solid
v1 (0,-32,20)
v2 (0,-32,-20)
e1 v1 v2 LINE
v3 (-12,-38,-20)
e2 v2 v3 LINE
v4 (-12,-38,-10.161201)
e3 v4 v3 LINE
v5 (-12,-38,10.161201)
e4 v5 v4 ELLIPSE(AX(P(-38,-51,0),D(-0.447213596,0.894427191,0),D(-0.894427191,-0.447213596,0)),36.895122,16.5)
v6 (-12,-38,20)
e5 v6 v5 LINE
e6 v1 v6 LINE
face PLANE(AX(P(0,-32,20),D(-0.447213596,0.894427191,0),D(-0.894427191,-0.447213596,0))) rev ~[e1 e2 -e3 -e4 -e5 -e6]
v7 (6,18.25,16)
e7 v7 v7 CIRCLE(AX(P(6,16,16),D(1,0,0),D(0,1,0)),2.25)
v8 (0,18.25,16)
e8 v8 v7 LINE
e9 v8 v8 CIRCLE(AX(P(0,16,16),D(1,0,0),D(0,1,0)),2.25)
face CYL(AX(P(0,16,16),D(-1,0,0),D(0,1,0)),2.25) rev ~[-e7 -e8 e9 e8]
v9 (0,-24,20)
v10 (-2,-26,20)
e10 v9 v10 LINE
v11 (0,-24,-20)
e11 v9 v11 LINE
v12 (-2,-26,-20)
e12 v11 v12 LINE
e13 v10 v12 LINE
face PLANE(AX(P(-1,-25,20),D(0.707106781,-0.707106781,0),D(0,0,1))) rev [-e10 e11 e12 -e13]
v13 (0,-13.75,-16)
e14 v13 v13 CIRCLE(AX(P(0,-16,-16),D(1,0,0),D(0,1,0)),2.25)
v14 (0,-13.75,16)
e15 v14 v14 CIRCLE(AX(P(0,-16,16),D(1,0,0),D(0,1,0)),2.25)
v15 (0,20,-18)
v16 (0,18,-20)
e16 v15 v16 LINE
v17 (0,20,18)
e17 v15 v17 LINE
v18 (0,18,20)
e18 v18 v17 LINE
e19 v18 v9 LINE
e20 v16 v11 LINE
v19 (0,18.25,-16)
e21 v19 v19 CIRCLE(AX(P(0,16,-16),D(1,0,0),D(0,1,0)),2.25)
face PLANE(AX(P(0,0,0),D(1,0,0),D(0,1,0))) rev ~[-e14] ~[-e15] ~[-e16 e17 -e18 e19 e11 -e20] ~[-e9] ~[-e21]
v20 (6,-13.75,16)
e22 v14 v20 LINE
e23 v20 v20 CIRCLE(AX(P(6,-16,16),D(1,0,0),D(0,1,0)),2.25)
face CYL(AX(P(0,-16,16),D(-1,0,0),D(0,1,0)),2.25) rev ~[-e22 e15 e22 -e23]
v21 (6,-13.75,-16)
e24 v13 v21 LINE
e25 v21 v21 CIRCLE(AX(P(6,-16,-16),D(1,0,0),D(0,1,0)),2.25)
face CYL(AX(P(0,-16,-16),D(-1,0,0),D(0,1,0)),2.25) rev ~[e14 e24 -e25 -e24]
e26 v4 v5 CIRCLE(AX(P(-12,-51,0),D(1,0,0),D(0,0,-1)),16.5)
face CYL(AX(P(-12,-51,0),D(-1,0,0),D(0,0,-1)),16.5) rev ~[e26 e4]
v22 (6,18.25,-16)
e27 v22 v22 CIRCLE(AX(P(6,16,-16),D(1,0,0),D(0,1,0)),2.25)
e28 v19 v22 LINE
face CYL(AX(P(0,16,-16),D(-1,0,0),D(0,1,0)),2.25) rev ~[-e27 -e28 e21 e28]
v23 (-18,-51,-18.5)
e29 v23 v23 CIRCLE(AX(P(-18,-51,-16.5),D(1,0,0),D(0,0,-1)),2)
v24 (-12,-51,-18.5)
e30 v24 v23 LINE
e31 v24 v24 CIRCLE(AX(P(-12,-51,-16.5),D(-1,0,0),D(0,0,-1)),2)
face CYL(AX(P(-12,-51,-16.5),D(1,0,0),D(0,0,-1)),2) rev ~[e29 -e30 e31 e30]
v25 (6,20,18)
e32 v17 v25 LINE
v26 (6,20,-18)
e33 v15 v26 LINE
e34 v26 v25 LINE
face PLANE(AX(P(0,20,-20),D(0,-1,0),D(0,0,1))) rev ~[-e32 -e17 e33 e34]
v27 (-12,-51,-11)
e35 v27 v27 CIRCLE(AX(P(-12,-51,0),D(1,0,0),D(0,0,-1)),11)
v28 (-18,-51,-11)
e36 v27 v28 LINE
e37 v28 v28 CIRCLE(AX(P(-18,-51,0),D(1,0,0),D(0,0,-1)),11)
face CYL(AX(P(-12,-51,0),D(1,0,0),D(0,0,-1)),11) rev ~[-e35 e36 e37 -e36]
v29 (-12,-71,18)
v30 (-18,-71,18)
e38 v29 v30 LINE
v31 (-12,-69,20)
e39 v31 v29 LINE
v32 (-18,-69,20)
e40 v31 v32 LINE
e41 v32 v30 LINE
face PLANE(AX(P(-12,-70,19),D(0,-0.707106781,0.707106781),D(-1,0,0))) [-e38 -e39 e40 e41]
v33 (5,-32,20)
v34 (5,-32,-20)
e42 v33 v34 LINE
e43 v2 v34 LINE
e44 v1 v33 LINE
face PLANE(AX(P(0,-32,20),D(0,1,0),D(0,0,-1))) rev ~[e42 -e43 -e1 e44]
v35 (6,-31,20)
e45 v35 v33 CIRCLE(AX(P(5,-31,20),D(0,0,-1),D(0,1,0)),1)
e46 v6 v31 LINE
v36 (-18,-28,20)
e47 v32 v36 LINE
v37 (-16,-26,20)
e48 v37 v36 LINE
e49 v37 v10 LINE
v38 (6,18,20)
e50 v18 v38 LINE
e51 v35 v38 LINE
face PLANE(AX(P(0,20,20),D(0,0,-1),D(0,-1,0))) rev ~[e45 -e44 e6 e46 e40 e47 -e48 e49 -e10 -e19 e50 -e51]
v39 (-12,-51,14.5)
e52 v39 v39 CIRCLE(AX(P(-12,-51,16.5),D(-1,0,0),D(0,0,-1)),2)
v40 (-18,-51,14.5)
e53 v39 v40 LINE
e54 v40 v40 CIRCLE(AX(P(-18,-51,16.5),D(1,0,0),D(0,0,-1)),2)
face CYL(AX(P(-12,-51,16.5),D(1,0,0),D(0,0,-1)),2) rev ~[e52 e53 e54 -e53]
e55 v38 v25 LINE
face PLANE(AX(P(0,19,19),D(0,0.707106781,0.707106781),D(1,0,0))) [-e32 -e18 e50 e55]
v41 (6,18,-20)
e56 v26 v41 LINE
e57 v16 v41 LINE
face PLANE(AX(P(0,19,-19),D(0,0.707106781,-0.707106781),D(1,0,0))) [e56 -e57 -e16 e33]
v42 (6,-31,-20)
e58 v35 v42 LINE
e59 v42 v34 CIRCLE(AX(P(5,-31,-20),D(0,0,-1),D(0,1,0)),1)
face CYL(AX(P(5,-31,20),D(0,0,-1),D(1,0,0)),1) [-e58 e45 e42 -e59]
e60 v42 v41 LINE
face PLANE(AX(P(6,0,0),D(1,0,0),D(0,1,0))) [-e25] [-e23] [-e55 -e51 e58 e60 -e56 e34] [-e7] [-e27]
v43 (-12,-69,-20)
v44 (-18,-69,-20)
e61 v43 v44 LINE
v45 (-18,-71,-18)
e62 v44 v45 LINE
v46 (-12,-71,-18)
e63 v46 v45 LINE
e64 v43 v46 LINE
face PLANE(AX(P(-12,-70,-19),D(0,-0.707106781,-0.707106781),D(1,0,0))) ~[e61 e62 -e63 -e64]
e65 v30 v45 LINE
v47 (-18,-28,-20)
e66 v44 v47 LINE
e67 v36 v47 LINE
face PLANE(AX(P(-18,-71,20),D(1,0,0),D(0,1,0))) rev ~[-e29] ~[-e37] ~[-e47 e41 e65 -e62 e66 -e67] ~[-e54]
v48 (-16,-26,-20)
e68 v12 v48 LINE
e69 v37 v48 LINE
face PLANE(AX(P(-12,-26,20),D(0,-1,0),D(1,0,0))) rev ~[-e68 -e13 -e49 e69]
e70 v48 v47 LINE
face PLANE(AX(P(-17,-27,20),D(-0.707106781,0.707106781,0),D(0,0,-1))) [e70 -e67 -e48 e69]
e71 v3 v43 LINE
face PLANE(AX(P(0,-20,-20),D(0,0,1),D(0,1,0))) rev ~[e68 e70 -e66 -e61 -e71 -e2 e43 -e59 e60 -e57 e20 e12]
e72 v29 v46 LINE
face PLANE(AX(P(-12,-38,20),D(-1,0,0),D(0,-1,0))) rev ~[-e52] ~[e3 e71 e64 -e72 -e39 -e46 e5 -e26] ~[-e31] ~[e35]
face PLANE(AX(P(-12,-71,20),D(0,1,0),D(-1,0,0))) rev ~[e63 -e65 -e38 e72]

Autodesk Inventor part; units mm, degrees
ref_plane "YZ Plane" through (0, 0, 0) normal (1, 0, 0) x (0, 1, 0)
ref_plane "XZ Plane" through (0, 0, 0) normal (0, 1, 0) x (-1, 0, 0)
ref_plane "XY Plane" through (0, 0, 0) normal (0, 0, 1) x (1, 0, 0)
sketch "Skizze1" plane through (0, 0, 0) normal (1, 0, 0) x (0, 1, 0)
  line L0 (-20, -20) -> (20, -20)
  line L1 (20, -20) -> (20, 20)
  line L2 (20, 20) -> (-20, 20)
  line L3 (-20, 20) -> (-20, -20)
  line L4 (-20, -20) -> (20, 20) construction
  line L5 (20, -20) -> (-20, 20) construction
  line L6 (-16, -16) -> (16, -16) construction
  line L7 (16, -16) -> (16, 16) construction
  line L8 (16, 16) -> (-16, 16) construction
  line L9 (-16, 16) -> (-16, -16) construction
  line L10 (-16, -16) -> (16, 16) construction
  line L11 (16, -16) -> (-16, 16) construction
  circle A0 centre (16, 16) radius 2.25
  circle A1 centre (16, -16) radius 2.25
  circle A2 centre (-16, -16) radius 2.25
  circle A3 centre (-16, 16) radius 2.25
  line L12 (-20, 20) -> (-32, 20)
  line L13 (-32, 20) -> (-32, -20)
  line L14 (-32, -20) -> (-20, -20)
  line L15 (-20, -20) -> (-20, 20)
  point P0 (0, 0)
  dimension "d0" = 40
  dimension "d1" = 40
  dimension "d2" = 32
  dimension "d3" = 32
  dimension "d4" = 4.5
  dimension "d5" = 4.5
  dimension "d6" = 4.5
  dimension "d7" = 4.5
  dimension "d8" = 12
extrude "Extrusion1" add sketch "Skizze1" along normal blind 6
ref_plane "Arbeitsebene1" through (0, -32, 20) normal (0, 0, 1) x (1, 0, 0)
sketch "Skizze2" plane through (0, -32, 20) normal (0, 0, 1) x (1, 0, 0)
  line L0 (0, 52) -> (0, 0) projected
  line L1 (0, 0) -> (6, 0) projected
  line L2 (6, 52) -> (6, 0) projected
  line L3 (0, 52) -> (6, 52) projected
  line L4 (-18, 6) -> (-12, 6)
  line L5 (-12, 6) -> (-12, -39)
  line L6 (-12, -39) -> (-18, -39)
  line L7 (-18, -39) -> (-18, 6)
  line L8 (0, 0) -> (-12, -6)
  line L9 (-12, 6) -> (0, 6)
  point P0 (0, 32)
  point P1 (-15, -39)
  point P2 (-15, 6)
  dimension "d12" = 6
  dimension "d13" = 45
  dimension "d14" = 6
  dimension "d15" = 12
  dimension "d16" = 12
extrude "Extrusion2" add sketch "Skizze2" against normal up to surface (40 mm away) contours L0 L8 L5 L9 | L5 L6 L7 L4
chamfer "Fasen1" distance 2 angle 45 6 edges at (-18, -26, 0) (0, -26, 0) (-15, -71, -20) (-15, -71, 20) (3, 20, -20) (3, 20, 20)
sketch "Skizze3" plane through (-12, -38, 20) normal (1, 0, 0) x (0, 0, -1)
  line L0 (2, -33) -> (0, -31) projected
  line L1 (2, -33) -> (38, -33) projected
  line L2 (40, -31) -> (38, -33) projected
  line L3 (40, 0) -> (40, -31) projected
  line L4 (0, 0) -> (40, 0) projected
  line L5 (0, -31) -> (0, 0) projected
  circle A0 centre (20, -13) radius 20
  circle A1 centre (20, -13) radius 16.5
  point P0 (20, 38)
  dimension "d22" = 33
extrude "Extrusion3" cut sketch "Skizze3" along normal through all contours A1 L4 | L4 A1
sketch "Skizze4" plane through (-12, -69, 20) normal (1, 0, 0) x (0, 0, -1)
  line L0 (0, 31) -> (9.8388, 31) projected
  line L1 (0, 0) -> (0, 31) projected
  line L2 (2, -2) -> (0, 0) projected
  line L3 (2, -2) -> (38, -2) projected
  line L4 (40, 0) -> (38, -2) projected
  line L5 (40, 31) -> (40, 0) projected
  line L6 (30.1612, 31) -> (40, 31) projected
  arc A0 (30.1612, 31) -> (9.8388, 31) centre (20, 18) ccw projected
  circle A1 centre (20, 18) radius 16.5
  circle A2 centre (3.5, 18) radius 2
  circle A3 centre (36.5, 18) radius 2
  point P0 (20, 69)
  dimension "d25" = 4
  dimension "d26" = 4
extrude "Extrusion4" cut sketch "Skizze4" against normal blind 10 contours A2 A1 | A1 A2 | A3 A1 | A1 A3
sketch "Skizze5" plane through (-12, -69, 20) normal (1, 0, 0) x (0, 0, -1)
  arc A0 (30.1612, 31) -> (9.8388, 31) centre (20, 18) ccw projected
  line L0 (0, 37) -> (40, 37) projected
  line L1 (0, 31) -> (0, 37) projected
  line L2 (0, 31) -> (9.8388, 31) projected
  circle A1 centre (20, 18) radius 11
  line L3 (30.1612, 31) -> (40, 31) projected
  line L4 (40, 37) -> (40, 31) projected
  point P0 (20, 69)
  dimension "d29" = 22
extrude "Extrusion5" cut sketch "Skizze5" against normal blind 10 contours A1
fillet "Rundung1" radius 1 1 edges at (6, -32, 0)
properties part number "40_XYZstage_micrometer_motorized_nema8_samplemount_lightsheet_screwed"
